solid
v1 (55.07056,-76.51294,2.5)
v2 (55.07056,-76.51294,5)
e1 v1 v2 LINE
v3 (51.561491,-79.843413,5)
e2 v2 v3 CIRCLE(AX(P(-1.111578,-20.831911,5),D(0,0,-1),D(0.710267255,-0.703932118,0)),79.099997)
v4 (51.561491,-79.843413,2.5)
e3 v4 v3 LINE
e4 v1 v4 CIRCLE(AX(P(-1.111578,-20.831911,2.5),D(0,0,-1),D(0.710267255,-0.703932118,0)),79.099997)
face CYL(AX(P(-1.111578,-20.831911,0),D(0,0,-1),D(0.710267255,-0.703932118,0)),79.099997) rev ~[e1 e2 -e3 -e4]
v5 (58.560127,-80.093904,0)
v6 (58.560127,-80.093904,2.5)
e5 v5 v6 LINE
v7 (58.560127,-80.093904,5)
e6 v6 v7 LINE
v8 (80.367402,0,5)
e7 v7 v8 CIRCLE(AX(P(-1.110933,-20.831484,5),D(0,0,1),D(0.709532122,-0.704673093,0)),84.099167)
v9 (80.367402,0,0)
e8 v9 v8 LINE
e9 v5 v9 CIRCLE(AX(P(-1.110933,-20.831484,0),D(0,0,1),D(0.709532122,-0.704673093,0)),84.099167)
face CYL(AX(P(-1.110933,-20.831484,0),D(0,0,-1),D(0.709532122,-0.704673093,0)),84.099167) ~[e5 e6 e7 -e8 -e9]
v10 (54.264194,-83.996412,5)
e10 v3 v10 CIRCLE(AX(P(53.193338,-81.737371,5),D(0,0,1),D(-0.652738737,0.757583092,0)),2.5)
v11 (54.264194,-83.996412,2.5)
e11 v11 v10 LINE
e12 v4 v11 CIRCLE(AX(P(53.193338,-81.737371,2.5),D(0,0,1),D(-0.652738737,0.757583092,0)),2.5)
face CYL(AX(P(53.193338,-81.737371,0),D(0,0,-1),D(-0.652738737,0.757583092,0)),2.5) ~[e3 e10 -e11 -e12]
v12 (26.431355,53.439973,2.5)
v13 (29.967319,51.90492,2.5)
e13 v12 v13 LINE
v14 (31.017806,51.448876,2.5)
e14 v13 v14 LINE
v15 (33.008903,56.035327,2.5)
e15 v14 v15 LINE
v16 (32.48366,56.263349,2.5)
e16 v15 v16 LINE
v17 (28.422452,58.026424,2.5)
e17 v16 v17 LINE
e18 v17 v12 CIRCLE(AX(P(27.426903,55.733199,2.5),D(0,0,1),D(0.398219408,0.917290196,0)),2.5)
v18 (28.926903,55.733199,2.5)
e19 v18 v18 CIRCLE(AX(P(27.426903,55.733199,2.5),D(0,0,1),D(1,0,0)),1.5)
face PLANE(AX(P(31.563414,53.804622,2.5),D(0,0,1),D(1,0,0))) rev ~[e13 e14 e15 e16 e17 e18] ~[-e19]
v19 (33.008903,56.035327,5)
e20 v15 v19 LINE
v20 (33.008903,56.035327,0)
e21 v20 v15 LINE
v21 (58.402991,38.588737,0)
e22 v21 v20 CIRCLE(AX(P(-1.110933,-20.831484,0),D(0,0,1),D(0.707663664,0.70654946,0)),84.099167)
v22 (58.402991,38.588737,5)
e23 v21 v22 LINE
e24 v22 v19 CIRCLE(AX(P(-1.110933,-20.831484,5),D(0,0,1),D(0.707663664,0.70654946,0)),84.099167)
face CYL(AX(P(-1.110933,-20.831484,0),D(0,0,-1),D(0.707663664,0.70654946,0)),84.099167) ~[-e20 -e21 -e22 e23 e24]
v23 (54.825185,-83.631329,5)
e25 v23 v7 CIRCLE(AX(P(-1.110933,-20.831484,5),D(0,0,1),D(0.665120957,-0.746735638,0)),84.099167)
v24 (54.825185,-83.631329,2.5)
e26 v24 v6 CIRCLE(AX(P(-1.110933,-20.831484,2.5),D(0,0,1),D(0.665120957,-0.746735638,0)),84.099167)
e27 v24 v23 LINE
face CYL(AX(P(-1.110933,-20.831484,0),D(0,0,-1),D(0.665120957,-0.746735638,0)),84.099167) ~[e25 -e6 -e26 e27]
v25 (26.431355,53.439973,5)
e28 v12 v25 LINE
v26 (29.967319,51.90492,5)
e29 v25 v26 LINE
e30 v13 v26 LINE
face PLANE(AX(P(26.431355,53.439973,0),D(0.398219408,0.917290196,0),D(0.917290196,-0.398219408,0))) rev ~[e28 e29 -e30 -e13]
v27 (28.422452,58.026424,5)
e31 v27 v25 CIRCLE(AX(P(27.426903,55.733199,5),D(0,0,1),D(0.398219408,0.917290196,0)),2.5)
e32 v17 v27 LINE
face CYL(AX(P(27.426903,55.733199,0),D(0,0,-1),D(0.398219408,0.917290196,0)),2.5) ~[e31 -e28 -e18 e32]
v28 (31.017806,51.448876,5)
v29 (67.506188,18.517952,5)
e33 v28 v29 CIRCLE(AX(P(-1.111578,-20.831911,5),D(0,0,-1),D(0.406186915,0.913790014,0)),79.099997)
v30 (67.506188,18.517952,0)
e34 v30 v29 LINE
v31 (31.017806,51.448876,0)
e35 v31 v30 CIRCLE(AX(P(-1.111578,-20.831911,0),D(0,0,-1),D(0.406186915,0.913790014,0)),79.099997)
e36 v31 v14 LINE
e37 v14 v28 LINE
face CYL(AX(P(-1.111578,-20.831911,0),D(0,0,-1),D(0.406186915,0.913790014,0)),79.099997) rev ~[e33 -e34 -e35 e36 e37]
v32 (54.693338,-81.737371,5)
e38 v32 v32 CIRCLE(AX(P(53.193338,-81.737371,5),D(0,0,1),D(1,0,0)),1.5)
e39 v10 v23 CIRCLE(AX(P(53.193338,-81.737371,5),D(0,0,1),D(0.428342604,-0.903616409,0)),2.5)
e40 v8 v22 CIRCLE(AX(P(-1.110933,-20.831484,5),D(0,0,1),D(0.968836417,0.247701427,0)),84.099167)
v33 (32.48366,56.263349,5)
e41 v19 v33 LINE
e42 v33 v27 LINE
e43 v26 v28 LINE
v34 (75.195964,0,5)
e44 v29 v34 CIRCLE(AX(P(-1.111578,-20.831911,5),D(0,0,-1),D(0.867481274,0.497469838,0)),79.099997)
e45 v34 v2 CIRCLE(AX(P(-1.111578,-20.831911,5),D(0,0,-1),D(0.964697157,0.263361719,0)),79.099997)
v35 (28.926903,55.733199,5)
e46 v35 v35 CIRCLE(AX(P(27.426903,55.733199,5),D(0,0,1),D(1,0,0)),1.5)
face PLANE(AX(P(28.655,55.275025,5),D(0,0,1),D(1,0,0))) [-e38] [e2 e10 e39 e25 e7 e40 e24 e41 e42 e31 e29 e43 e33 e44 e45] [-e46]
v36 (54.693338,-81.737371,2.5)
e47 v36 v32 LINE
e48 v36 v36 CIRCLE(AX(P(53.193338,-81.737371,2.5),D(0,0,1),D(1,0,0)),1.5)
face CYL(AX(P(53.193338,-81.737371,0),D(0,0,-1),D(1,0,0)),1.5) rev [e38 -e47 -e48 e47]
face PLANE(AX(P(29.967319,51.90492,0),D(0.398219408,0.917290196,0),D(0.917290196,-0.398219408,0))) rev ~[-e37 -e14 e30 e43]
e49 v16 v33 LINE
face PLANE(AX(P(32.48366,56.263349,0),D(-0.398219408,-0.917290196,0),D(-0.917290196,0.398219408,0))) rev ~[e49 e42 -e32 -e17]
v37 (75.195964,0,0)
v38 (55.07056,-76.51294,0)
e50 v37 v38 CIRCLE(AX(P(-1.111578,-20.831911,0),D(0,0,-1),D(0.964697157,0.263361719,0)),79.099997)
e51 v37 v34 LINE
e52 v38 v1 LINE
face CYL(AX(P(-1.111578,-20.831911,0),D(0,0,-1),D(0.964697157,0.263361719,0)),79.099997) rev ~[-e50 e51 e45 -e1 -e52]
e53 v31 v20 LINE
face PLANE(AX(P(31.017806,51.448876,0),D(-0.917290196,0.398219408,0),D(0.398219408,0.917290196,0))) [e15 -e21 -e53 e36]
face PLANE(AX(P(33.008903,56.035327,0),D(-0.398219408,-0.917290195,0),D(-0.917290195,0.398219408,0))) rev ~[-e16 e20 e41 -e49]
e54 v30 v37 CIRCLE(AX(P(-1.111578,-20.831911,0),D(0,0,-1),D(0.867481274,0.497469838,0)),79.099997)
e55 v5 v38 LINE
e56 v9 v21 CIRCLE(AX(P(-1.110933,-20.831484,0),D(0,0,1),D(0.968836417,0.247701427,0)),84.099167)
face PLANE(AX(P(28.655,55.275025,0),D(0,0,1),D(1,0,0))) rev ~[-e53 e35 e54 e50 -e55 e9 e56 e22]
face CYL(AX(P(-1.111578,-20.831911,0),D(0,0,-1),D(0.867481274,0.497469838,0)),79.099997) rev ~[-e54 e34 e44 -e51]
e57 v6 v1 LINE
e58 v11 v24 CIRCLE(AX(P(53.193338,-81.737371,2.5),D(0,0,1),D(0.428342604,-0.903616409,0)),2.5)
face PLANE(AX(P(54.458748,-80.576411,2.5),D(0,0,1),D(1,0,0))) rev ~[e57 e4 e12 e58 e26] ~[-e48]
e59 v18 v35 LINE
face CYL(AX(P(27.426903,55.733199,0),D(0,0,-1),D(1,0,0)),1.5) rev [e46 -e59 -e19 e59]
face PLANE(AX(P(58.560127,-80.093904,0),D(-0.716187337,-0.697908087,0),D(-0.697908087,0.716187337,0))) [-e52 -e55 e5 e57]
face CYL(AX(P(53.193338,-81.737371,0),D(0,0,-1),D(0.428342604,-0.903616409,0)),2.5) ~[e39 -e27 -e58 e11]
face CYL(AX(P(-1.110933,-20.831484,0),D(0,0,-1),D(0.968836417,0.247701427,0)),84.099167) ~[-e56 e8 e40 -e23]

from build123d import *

# Parameters (mm, degrees)
F0_R     = 1.5
F1_DEPTH = 5
F2_DEPTH = 2.5
F4_DEPTH = 2.5


# Not quite as in the source:
# - a feature names something its author has since deleted; it is built from what else it names


with BuildPart() as f1:
    # F0 (on Top) → F1 (new body)
    with BuildSketch(Plane.XY):
        with BuildLine():
            Line((30, 51.9615242271), (32.4836596815, 56.2633489842))
            Line((32.4836596815, 56.2633489842), (28.4224519805, 58.0264243292))
            ThreePointArc((28.4224519805, 58.0264243292), (25.1336779708, 56.7287473614), (26.4313549386, 53.4399733516))
            Line((26.4313549386, 53.4399733516), (29.967319363, 51.9049197034))
            Line((29.967319363, 51.9049197034), (30, 51.9615242271))
        make_face()
        with Locations((27.4269034596, 55.7331988404)):
            Circle(F0_R, mode=Mode.SUBTRACT)
        with BuildLine():
            ThreePointArc((67.5061883913, 18.5179515304), (63.7494272333, 28.9138466382), (58.4029909795, 38.5887372772))
            ThreePointArc((58.4029909795, 38.5887372772), (46.511709986, 48.4848469682), (33.0089029581, 56.0353272873))
            Line((33.0089029581, 56.0353272873), (31.0178059162, 51.4488763097))
            ThreePointArc((31.0178059162, 51.4488763097), (51.8847287198, 37.8894735935), (67.5061883913, 18.5179515304))
        make_face()
        Polygon((31.0178059162, 51.4488763097), (33.0089029581, 56.0353272873), (32.4836596815, 56.2633489842), (30, 51.9615242271), (29.967319363, 51.9049197034), align=None)
        with BuildLine():
            ThreePointArc((54.2641944404, -83.9964118384), (54.5449950566, -83.8143395504), (54.8251847727, -83.6313285476))
            ThreePointArc((54.8251847727, -83.6313285476), (56.7197095597, -81.8911804241), (58.5601267726, -80.0939035554))
            Line((58.5601267726, -80.0939035554), (55.0705599201, -76.5129397591))
            ThreePointArc((55.0705599201, -76.5129397591), (53.341493873, -78.2050105238), (51.5614910891, -79.8434130866))
            ThreePointArc((51.5614910891, -79.8434130866), (51.0979794421, -83.1009956935), (54.2641944404, -83.9964118384))
        make_face()
        with Locations((53.1933379309, -81.7373708171)):
            Circle(F0_R, mode=Mode.SUBTRACT)
        with BuildLine():
            Line((55.0705599201, -76.5129397591), (58.5601267726, -80.0939035554))
            ThreePointArc((58.5601267726, -80.0939035554), (80.0342840094, -42.9250014233), (80.3674019431, 0))
            Line((80.3674019431, 0), (75.1959644791, 0))
            ThreePointArc((75.1959644791, 0), (75.3863719236, -40.9533729371), (55.0705599201, -76.5129397591))
        make_face()
        with BuildLine():
            ThreePointArc((54.2641944404, -83.9964118384), (54.5569628073, -83.8327293059), (54.8251847727, -83.6313285476))
            ThreePointArc((54.8251847727, -83.6313285476), (54.5449950566, -83.8143395504), (54.2641944404, -83.9964118384))
        make_face()
        with BuildLine():
            Line((75.1959644791, 0), (80.3674019431, 0))
            ThreePointArc((80.3674019431, 0), (71.977896021, 20.7701131861), (58.4029909795, 38.5887372772))
            ThreePointArc((58.4029909795, 38.5887372772), (63.7494272333, 28.9138466382), (67.5061883913, 18.5179515304))
            ThreePointArc((67.5061883913, 18.5179515304), (71.9402181457, 9.5036231189), (75.1959644791, 0))
        make_face()
    extrude(amount=F1_DEPTH)


with BuildPart() as f2:
    # F0 (on Top) → F2 (new body)
    with BuildSketch(Plane.XY):
        Polygon((31.0178059162, 51.4488763097), (33.0089029581, 56.0353272873), (32.4836596815, 56.2633489842), (30, 51.9615242271), (29.967319363, 51.9049197034), align=None)
        with BuildLine():
            Line((30, 51.9615242271), (32.4836596815, 56.2633489842))
            Line((32.4836596815, 56.2633489842), (28.4224519805, 58.0264243292))
            ThreePointArc((28.4224519805, 58.0264243292), (25.1336779708, 56.7287473614), (26.4313549386, 53.4399733516))
            Line((26.4313549386, 53.4399733516), (29.967319363, 51.9049197034))
            Line((29.967319363, 51.9049197034), (30, 51.9615242271))
        make_face()
        with Locations((27.4269034596, 55.7331988404)):
            Circle(F0_R, mode=Mode.SUBTRACT)
    extrude(amount=F2_DEPTH)


with BuildPart() as f1_1:
    add(f1.part)

    # F3: cut F2
    add(f2.part, mode=Mode.SUBTRACT)


with BuildPart() as f4:
    # F0 (on Top) → F4 (new body)
    with BuildSketch(Plane.XY):
        with BuildLine():
            ThreePointArc((54.2641944404, -83.9964118384), (54.5449950566, -83.8143395504), (54.8251847727, -83.6313285476))
            ThreePointArc((54.8251847727, -83.6313285476), (56.7197095597, -81.8911804241), (58.5601267726, -80.0939035554))
            Line((58.5601267726, -80.0939035554), (55.0705599201, -76.5129397591))
            ThreePointArc((55.0705599201, -76.5129397591), (53.341493873, -78.2050105238), (51.5614910891, -79.8434130866))
            ThreePointArc((51.5614910891, -79.8434130866), (51.0979794421, -83.1009956935), (54.2641944404, -83.9964118384))
        make_face()
        with Locations((53.1933379309, -81.7373708171)):
            Circle(F0_R, mode=Mode.SUBTRACT)
        with BuildLine():
            ThreePointArc((54.2641944404, -83.9964118384), (54.5569628073, -83.8327293059), (54.8251847727, -83.6313285476))
            ThreePointArc((54.8251847727, -83.6313285476), (54.5449950566, -83.8143395504), (54.2641944404, -83.9964118384))
        make_face()
    extrude(amount=F4_DEPTH)


with BuildPart() as f1_2:
    add(f1_1.part)

    # F5: cut F4
    add(f4.part, mode=Mode.SUBTRACT)


solid = f1_2.part
